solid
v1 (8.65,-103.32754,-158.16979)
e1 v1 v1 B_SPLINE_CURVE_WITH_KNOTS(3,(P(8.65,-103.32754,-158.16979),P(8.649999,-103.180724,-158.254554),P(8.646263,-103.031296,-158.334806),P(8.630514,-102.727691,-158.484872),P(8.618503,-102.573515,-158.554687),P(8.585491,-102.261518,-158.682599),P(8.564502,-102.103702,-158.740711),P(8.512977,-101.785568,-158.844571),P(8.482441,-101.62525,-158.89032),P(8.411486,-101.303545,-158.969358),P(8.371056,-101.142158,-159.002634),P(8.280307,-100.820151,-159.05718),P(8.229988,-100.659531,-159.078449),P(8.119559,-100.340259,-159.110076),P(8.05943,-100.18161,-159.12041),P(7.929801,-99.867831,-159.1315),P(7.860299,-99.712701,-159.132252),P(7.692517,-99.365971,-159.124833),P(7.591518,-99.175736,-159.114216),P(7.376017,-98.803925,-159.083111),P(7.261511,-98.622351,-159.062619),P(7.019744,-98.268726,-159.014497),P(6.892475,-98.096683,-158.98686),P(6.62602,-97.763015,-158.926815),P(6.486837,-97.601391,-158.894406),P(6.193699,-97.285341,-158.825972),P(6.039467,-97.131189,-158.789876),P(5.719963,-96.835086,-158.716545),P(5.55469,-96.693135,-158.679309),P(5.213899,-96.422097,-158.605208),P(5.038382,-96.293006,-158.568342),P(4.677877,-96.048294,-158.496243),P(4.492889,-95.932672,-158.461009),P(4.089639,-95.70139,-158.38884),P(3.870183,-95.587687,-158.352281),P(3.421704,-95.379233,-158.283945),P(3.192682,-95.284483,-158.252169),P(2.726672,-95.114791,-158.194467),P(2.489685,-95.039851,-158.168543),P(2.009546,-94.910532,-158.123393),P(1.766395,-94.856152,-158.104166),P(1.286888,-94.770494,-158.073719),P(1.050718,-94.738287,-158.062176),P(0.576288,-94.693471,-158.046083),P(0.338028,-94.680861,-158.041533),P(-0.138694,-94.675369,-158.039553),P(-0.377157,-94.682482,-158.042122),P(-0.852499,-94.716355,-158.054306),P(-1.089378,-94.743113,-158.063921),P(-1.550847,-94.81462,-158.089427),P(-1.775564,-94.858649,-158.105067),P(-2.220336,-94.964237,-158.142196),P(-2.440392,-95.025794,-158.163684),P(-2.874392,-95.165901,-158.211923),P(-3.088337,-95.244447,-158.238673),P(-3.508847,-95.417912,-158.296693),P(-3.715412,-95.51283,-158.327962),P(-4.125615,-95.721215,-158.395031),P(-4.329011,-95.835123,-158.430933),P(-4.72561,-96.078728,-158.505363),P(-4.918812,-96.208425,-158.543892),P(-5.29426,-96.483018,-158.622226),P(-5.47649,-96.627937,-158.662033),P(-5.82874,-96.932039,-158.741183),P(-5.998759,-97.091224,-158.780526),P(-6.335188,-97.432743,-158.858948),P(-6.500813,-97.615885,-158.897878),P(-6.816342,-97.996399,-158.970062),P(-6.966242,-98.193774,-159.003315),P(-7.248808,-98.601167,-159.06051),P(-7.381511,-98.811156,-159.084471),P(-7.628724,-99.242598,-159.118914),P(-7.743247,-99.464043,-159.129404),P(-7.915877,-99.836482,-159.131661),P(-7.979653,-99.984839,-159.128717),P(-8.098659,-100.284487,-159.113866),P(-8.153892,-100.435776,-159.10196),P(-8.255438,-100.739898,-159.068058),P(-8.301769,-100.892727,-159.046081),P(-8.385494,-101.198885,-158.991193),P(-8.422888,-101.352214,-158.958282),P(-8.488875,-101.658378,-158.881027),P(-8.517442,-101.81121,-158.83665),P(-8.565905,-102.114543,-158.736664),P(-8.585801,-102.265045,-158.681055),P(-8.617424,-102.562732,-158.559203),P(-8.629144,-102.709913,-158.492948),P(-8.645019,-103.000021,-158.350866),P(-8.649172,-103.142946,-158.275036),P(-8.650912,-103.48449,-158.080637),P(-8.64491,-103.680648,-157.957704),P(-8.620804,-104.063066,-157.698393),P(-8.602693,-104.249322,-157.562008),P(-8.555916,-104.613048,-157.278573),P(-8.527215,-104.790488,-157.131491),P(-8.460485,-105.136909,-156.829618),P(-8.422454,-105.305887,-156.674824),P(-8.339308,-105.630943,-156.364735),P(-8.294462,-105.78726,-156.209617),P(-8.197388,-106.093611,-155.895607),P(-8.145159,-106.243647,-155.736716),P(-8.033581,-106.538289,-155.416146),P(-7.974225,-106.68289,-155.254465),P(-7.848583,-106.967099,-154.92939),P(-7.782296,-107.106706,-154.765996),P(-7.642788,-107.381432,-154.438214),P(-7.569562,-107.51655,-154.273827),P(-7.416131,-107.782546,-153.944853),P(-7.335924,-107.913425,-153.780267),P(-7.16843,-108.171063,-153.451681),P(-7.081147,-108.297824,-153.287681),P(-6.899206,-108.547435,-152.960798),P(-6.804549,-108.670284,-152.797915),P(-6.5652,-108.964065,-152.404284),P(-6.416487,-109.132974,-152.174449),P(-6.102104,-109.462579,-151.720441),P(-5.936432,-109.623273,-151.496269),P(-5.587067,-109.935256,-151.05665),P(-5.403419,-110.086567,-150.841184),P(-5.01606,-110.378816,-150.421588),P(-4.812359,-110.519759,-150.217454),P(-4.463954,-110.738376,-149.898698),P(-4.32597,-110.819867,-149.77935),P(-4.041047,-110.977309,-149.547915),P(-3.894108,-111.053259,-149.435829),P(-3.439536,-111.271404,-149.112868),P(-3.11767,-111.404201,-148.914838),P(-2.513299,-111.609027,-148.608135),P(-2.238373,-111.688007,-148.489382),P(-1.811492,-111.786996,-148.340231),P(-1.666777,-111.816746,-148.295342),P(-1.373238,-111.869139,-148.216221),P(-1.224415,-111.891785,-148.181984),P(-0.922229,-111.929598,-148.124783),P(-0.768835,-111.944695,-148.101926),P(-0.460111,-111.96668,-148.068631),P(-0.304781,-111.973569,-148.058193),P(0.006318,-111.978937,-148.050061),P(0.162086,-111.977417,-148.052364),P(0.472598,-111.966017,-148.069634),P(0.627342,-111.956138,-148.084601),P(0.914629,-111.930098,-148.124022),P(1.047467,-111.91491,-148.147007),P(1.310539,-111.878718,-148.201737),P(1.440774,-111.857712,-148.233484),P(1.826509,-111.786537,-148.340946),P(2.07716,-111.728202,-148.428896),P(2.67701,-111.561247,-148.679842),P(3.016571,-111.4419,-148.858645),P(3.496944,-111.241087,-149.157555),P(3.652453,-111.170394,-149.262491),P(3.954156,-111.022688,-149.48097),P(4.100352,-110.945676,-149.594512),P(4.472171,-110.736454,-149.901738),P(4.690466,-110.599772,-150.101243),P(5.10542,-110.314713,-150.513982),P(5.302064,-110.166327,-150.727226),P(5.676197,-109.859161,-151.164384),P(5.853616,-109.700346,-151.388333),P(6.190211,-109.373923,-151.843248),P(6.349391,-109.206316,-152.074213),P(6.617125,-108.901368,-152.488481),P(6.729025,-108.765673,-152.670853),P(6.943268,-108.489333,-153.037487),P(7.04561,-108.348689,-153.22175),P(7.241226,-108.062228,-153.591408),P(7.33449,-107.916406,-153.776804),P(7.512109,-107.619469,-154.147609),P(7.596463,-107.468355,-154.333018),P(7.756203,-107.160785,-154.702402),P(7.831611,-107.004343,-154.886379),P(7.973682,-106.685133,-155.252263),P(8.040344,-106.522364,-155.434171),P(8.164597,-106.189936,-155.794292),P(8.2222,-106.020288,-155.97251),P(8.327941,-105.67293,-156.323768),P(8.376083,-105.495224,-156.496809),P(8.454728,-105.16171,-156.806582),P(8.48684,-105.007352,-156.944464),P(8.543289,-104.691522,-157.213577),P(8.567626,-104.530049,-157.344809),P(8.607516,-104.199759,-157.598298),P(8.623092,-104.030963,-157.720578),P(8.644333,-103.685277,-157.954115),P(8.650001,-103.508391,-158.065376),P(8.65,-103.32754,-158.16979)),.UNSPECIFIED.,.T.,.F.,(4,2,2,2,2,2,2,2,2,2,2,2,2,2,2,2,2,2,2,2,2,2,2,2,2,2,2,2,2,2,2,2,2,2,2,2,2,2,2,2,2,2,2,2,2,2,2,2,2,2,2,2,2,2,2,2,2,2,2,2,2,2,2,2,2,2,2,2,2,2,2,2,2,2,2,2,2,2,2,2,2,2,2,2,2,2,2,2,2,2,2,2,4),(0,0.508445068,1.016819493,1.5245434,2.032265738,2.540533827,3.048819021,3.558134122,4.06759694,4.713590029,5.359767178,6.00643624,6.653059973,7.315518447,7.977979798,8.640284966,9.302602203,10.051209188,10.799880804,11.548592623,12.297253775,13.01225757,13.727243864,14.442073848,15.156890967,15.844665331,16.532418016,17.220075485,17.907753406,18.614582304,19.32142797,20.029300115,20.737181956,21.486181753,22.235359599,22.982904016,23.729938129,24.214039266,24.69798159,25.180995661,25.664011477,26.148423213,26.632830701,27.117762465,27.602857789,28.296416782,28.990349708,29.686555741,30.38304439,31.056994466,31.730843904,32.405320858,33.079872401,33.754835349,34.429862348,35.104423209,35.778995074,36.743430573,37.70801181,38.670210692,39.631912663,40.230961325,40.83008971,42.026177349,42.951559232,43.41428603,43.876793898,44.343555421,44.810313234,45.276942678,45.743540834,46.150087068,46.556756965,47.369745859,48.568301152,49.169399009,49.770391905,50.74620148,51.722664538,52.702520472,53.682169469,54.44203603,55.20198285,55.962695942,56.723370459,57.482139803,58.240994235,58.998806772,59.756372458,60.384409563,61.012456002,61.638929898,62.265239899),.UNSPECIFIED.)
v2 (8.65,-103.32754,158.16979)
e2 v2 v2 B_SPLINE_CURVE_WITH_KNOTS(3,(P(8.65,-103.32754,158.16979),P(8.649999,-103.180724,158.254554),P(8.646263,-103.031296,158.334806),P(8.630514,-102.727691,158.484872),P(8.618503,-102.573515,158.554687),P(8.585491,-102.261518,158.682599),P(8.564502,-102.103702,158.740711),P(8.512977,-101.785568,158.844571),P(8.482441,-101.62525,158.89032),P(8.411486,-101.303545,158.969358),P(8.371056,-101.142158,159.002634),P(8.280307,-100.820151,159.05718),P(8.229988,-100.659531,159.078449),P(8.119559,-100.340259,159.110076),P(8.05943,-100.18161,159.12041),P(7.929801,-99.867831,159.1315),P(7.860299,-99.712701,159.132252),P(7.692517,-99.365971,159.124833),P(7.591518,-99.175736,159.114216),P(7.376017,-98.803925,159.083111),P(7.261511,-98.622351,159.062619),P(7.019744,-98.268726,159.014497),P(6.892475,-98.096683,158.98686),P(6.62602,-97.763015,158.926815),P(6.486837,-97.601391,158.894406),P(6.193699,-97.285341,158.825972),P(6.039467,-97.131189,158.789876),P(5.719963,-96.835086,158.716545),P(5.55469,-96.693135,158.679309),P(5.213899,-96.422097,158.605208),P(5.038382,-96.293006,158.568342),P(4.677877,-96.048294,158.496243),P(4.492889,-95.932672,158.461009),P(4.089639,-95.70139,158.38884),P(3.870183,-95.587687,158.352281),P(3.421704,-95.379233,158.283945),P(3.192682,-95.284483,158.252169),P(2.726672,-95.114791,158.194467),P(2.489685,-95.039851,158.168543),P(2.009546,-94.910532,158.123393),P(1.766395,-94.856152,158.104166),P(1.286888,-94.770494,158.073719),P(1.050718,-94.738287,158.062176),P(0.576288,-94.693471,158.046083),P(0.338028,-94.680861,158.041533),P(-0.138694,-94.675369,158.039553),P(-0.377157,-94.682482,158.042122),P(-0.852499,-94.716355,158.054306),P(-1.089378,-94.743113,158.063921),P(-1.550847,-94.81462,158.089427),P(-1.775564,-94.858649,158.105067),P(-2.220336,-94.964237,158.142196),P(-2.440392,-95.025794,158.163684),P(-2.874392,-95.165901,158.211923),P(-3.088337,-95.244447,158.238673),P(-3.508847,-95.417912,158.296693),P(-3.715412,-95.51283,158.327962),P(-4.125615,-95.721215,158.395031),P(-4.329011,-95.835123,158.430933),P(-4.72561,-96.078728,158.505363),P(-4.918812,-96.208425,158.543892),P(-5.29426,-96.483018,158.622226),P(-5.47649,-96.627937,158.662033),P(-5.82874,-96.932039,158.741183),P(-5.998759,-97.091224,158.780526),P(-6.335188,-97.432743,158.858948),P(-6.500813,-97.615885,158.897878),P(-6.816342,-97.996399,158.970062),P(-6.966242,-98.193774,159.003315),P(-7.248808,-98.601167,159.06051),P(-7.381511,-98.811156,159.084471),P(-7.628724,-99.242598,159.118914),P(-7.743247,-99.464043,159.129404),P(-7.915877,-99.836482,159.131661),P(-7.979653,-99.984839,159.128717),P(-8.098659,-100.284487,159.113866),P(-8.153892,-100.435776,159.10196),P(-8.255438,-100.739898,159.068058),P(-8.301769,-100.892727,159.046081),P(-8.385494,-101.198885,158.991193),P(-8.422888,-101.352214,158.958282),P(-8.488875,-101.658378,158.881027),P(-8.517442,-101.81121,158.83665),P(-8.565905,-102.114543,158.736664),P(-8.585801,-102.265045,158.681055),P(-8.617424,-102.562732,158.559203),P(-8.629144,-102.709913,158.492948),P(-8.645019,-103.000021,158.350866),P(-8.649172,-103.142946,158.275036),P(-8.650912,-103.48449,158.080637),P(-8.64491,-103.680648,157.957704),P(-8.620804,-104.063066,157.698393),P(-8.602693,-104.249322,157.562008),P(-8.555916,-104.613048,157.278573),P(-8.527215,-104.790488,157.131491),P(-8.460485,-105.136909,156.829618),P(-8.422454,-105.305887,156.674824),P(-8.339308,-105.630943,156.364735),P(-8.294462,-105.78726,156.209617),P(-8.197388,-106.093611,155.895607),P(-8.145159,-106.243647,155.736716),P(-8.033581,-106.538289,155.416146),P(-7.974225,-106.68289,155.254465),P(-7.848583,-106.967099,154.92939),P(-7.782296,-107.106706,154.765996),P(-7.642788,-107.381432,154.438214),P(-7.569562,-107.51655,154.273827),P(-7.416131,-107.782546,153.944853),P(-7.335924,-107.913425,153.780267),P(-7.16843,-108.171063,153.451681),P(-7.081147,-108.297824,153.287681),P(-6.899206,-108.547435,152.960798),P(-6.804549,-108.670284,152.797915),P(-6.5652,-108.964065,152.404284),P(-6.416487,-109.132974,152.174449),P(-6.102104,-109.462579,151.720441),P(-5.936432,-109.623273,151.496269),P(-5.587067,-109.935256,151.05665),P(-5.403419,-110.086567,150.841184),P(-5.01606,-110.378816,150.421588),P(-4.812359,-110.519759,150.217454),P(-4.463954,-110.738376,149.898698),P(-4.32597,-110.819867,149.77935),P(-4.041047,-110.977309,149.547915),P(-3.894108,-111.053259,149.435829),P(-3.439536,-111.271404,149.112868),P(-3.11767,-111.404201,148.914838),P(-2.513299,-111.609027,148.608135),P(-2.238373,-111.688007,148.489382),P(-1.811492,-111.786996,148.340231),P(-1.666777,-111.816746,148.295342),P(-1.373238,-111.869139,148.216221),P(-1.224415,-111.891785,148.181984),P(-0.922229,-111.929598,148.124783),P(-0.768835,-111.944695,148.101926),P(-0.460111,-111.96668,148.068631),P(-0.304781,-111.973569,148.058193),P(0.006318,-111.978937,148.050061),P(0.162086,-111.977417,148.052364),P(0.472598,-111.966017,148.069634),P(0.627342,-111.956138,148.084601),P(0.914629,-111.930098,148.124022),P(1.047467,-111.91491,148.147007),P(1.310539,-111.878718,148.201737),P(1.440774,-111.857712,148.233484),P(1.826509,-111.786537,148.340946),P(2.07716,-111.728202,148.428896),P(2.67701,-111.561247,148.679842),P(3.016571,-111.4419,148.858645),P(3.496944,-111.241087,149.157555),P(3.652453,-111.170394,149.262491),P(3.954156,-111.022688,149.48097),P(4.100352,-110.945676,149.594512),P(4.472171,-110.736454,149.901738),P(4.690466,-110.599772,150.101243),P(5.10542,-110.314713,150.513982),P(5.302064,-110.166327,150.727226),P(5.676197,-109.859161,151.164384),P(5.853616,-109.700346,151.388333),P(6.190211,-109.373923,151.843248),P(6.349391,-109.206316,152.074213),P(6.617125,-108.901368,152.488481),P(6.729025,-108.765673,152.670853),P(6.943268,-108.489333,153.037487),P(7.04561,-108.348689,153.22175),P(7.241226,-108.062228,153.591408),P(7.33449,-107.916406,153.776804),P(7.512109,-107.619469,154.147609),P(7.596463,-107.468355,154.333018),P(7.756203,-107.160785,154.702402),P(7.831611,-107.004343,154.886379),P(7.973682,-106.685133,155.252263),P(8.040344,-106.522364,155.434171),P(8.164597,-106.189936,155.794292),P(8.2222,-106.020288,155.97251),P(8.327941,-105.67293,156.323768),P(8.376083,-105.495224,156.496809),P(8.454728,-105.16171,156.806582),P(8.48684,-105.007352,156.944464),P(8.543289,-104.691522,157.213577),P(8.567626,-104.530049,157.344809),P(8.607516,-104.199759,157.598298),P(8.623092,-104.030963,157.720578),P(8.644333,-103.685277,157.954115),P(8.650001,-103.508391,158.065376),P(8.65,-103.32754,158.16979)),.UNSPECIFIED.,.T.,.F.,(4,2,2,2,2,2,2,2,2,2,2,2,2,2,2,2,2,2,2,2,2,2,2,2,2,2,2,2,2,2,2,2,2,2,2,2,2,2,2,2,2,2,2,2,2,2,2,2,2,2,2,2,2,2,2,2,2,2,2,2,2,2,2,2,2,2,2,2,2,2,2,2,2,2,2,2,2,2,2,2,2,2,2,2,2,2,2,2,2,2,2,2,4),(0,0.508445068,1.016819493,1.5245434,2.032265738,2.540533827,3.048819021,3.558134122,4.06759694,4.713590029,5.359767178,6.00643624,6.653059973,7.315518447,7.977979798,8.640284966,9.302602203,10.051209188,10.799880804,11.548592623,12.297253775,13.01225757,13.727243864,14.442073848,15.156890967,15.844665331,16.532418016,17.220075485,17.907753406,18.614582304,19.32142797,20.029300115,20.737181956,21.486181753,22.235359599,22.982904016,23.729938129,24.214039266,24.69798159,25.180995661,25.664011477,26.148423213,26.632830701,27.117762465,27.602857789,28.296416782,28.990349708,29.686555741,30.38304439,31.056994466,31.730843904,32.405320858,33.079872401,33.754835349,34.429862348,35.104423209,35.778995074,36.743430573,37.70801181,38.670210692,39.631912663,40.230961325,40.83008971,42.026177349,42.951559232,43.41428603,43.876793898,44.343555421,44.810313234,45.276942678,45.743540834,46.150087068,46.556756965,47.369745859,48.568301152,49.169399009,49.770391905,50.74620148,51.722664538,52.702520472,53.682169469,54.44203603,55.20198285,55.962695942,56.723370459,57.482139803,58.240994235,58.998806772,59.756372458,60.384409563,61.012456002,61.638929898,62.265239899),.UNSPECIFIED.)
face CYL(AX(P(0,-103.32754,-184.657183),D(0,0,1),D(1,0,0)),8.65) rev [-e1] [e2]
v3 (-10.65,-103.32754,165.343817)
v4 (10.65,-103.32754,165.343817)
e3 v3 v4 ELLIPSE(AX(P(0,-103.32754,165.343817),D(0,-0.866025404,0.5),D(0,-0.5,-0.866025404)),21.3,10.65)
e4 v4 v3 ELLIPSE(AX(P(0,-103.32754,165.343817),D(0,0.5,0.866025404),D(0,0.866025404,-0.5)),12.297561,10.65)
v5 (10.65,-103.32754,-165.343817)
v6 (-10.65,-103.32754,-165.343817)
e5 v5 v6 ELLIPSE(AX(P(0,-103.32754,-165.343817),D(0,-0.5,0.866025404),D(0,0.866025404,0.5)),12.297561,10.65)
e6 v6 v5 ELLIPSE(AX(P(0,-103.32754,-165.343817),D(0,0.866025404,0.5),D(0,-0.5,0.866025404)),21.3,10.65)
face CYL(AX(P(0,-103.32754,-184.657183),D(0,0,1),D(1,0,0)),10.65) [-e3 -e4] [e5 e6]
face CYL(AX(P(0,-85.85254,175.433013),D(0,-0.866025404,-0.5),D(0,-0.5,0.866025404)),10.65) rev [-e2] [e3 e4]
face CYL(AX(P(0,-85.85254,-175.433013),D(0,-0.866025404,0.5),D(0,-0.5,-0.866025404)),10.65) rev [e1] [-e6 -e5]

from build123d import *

# Parameters (mm, degrees)
EXTRUDE_START           = -146.897476
EXTRUDE_1_OUTLINE_R     = 10.65
EXTRUDE_1_OUTLINE_R_2   = 8.65
EXTRUDE_1_DEPTH         = 146.897476
EXTRUDE_START_2         = -165.343817
EXTRUDE_1_2_OUTLINE_R   = 10.65
EXTRUDE_1_2_OUTLINE_R_2 = 8.65
EXTRUDE_1_2_DEPTH       = 18.446341
EXTRUDE_START_3         = -98.707445
EXTRUDE_1_3_DEPTH       = 101.707445


with BuildPart() as part:
    # Бобышка-Вытянуть1: read off the stored shape, not the designer's step
    # Бобышка-Вытянуть1 outline → Бобышка-Вытянуть1 (new body)
    with BuildSketch(Plane.XY.offset(EXTRUDE_START)):
        with Locations((0, -103.32754)):
            Circle(EXTRUDE_1_OUTLINE_R)
        with Locations((0, -103.32754)):
            Circle(EXTRUDE_1_OUTLINE_R_2, mode=Mode.SUBTRACT)
    extrude(amount=EXTRUDE_1_DEPTH)

    # Extrude 1 2 outline → Extrude 1 2 (add)
    with BuildSketch(Plane.XY.offset(EXTRUDE_START_2)):
        with Locations((0, -103.32754)):
            Circle(EXTRUDE_1_2_OUTLINE_R)
        with Locations((0, -103.32754)):
            Circle(EXTRUDE_1_2_OUTLINE_R_2, mode=Mode.SUBTRACT)
    extrude(amount=EXTRUDE_1_2_DEPTH)

    # Extrude 1 3 outline → Extrude 1 3 (cut)
    with BuildSketch(Plane(origin=(0, 0, 0), x_dir=(1, 0, 0), z_dir=(0, 0.8660254037845095, -0.4999999999998773)).offset(EXTRUDE_START_3)):
        with BuildLine():
            ThreePointArc((-10.65, 194.855716), (0, 184.205716), (10.65, 194.855716))
            Line((10.65, 194.855716), (10.65, 202))
            Line((10.65, 202), (-10.65, 202))
            Line((-10.65, 202), (-10.65, 194.855716))
        make_face()
    extrude(amount=EXTRUDE_1_3_DEPTH, mode=Mode.SUBTRACT)

    # Зеркальное отражение1: part across plane


with BuildPart() as part_1:
    add(part.part)
    add(part.part.mirror(Plane(origin=(0, -103.32754, 0), x_dir=(1, 0, 0), z_dir=(0, 0, 1))))


solid = part_1.part
